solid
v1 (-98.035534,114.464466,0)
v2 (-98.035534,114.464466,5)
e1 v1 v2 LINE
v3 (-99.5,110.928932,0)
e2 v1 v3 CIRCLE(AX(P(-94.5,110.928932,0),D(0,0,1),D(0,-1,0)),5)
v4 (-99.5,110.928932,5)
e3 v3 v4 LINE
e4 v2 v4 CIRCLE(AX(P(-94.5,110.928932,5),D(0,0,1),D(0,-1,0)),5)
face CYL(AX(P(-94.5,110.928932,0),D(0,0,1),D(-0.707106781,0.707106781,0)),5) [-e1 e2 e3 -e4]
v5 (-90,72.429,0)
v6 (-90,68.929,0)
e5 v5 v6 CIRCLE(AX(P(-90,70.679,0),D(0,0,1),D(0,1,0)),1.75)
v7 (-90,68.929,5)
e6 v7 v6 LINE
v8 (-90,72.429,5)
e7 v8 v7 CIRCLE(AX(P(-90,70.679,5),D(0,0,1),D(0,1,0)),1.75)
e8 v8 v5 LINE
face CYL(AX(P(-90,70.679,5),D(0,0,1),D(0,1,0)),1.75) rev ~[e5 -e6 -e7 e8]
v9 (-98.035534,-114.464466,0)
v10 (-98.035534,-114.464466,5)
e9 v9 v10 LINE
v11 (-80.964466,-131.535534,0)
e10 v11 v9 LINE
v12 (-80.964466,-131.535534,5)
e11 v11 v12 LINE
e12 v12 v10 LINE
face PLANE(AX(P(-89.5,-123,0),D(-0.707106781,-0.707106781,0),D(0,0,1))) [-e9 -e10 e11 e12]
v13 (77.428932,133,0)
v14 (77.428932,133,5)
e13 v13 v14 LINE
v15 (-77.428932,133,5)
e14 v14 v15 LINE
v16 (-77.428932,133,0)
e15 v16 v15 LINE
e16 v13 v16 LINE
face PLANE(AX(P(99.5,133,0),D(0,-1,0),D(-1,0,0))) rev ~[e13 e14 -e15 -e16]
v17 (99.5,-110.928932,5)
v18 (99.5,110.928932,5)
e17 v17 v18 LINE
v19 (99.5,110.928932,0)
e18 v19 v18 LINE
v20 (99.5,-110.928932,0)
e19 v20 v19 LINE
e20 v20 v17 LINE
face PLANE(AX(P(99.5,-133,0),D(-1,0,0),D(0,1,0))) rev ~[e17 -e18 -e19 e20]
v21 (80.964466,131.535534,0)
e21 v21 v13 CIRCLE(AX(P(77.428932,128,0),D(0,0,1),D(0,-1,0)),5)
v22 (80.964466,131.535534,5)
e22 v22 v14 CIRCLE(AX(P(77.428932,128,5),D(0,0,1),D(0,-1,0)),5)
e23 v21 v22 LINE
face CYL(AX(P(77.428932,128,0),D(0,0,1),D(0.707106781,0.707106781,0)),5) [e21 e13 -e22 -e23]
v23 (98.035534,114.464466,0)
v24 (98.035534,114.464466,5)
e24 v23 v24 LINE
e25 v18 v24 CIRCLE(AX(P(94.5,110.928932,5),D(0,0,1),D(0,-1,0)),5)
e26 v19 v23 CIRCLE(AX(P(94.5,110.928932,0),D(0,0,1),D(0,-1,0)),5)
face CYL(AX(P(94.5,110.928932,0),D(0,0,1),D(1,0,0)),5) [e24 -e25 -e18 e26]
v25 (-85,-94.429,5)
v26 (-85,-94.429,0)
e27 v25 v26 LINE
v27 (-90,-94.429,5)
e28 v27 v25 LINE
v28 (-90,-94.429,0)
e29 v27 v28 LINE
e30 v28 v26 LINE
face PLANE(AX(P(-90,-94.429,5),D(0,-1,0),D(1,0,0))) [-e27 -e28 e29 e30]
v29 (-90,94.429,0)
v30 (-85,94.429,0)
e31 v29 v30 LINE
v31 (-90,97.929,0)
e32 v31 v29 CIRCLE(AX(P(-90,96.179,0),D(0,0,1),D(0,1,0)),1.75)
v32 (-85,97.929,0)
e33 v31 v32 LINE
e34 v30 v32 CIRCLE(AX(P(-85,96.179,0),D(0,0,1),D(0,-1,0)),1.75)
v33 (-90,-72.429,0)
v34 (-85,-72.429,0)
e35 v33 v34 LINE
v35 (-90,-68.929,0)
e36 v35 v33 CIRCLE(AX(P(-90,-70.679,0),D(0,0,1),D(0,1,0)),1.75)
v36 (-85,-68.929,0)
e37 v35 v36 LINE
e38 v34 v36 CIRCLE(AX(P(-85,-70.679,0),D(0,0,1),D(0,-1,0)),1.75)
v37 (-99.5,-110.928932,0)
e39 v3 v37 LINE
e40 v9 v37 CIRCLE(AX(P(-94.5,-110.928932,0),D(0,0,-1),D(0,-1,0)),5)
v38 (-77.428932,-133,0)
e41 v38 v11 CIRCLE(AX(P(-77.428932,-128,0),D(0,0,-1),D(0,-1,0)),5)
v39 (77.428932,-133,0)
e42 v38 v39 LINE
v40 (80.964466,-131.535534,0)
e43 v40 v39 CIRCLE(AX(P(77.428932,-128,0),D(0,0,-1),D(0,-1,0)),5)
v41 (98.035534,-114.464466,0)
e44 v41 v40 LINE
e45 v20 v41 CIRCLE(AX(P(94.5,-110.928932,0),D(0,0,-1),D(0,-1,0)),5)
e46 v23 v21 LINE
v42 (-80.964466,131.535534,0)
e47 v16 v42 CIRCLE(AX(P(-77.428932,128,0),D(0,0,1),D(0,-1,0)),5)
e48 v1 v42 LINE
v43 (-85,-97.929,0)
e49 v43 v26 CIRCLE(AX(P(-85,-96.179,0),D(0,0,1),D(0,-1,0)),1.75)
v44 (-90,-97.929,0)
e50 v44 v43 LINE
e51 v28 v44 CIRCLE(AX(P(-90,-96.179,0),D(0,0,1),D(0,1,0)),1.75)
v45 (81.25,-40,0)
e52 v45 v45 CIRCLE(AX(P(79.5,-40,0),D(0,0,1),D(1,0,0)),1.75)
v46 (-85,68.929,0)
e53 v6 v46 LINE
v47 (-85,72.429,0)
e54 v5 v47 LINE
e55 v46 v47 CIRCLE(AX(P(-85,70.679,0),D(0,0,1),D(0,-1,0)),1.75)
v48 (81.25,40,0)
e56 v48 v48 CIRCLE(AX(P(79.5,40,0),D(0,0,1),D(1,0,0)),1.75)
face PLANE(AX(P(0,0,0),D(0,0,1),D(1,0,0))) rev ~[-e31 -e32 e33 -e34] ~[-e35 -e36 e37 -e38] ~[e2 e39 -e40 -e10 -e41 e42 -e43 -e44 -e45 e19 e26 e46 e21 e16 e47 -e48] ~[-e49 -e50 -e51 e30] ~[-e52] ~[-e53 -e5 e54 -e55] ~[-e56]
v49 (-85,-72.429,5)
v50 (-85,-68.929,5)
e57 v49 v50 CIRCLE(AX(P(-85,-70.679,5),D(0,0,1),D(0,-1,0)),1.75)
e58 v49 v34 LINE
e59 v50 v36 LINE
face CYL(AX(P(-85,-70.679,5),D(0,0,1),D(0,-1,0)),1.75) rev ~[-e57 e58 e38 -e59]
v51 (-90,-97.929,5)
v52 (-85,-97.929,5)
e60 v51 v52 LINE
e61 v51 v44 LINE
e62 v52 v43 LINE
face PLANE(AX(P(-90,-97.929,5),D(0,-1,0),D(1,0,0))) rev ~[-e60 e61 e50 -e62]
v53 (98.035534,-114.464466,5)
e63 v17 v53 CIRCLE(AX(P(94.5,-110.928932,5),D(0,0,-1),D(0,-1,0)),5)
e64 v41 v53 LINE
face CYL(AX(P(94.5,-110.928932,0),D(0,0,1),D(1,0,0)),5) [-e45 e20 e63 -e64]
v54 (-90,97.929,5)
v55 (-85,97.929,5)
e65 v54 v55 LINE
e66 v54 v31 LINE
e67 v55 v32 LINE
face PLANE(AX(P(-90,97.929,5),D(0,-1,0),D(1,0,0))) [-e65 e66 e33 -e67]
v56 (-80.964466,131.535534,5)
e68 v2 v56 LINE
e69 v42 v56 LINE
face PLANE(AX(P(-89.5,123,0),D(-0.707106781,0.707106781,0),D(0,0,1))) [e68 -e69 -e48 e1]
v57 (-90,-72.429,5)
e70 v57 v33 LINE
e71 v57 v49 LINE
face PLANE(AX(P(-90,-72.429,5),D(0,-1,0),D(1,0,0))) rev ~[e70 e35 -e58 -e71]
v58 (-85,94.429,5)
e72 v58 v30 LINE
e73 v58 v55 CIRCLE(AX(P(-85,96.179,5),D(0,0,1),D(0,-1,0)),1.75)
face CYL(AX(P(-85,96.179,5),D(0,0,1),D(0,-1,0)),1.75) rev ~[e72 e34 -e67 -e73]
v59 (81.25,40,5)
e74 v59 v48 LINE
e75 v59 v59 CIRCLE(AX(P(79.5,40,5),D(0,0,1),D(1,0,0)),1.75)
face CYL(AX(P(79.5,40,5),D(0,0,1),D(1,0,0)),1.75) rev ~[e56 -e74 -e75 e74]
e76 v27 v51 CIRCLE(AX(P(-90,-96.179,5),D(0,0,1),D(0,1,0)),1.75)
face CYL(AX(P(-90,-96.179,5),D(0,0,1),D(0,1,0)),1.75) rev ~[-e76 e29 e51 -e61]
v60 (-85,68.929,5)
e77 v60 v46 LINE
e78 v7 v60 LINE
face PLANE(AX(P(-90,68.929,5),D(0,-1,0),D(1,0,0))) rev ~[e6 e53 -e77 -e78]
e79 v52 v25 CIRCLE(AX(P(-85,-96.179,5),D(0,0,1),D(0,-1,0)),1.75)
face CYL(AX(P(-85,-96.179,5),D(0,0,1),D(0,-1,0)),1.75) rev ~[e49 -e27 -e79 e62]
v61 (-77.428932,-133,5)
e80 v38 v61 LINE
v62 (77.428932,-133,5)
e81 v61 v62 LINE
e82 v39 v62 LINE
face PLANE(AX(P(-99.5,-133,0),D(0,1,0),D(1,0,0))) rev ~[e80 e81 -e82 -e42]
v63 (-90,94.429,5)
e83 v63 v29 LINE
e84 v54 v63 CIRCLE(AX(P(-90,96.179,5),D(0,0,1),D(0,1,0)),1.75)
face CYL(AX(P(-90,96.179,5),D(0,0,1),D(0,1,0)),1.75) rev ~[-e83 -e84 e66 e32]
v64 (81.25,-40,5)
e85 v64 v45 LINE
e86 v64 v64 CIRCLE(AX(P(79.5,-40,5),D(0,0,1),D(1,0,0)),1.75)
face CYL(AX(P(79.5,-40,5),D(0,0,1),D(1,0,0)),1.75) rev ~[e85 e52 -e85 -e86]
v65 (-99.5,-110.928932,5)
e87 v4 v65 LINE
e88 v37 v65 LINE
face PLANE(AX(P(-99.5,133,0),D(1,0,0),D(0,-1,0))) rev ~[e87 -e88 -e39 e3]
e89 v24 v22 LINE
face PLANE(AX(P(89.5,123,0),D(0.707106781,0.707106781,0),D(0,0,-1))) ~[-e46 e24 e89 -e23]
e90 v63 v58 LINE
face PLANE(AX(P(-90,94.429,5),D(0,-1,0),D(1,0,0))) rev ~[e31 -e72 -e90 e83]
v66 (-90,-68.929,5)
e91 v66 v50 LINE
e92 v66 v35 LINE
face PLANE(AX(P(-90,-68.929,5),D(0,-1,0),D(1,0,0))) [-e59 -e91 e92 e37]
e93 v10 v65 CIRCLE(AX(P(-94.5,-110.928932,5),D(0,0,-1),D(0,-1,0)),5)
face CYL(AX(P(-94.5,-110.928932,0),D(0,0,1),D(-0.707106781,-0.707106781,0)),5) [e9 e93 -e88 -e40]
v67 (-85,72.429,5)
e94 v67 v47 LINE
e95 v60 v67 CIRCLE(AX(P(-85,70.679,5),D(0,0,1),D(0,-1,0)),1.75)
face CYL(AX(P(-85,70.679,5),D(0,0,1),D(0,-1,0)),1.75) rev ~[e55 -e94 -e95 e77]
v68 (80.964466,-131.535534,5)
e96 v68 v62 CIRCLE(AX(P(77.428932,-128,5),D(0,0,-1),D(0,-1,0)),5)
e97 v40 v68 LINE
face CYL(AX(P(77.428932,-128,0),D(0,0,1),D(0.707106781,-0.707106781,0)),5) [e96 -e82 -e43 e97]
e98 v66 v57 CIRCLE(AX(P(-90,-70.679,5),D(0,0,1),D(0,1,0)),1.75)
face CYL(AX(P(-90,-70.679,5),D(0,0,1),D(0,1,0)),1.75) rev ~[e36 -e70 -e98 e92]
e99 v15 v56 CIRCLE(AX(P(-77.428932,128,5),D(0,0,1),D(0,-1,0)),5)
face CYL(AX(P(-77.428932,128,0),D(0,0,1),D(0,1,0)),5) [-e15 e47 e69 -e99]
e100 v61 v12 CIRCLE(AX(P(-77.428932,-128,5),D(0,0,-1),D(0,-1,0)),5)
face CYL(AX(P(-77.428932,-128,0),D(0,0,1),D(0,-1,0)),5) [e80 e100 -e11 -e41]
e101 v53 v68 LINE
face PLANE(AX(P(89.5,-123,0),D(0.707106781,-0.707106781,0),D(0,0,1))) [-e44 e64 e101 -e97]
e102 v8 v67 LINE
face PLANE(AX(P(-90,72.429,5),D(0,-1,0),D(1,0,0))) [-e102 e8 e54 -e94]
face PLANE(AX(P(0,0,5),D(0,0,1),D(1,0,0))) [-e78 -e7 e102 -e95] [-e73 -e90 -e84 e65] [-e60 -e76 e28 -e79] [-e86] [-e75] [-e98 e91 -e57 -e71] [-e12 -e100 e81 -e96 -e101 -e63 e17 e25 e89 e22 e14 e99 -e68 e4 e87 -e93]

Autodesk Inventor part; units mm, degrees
ref_plane "YZ Plane" through (0, 0, 0) normal (1, 0, 0) x (0, 1, 0)
ref_plane "XZ Plane" through (0, 0, 0) normal (0, 1, 0) x (-1, 0, 0)
ref_plane "XY Plane" through (0, 0, 0) normal (0, 0, 1) x (1, 0, 0)
sketch "Handle-Hole" plane through (0, 0, 0) normal (0, 0, 1) x (1, 0, 0)
  line L0 (-99.5, 50) -> (-69.5, 50)
  line L1 (-69.5, 50) -> (-69.5, -50)
  line L2 (-69.5, -50) -> (-99.5, -50)
  line L3 (-99.5, -50) -> (-99.5, 50)
  circle A0 centre (-87.5, 62) radius 1.75
  circle A1 centre (-57.5, 27.5) radius 1.75
  circle A2 centre (-57.5, -27.5) radius 1.75
  circle A3 centre (-87.5, -62) radius 1.75
  point P0 (-82.2826, 0)
  point P1 (-99.5, 0)
  point P2 (-99.5, 0)
  dimension "d9" = 30
  dimension "d10" = 100
  dimension "d11" = 3.5
  dimension "d12" = 3.5
  dimension "d13" = 3.5
  dimension "d14" = 3.5
  dimension "d15" = 55
  dimension "d16" = 12
  dimension "d17" = 12
  dimension "d18" = 12
sketch "Hinges Screw Holes" plane through (0, 0, 0) normal (0, 0, 1) x (1, 0, 0)
  arc A0 (172, -72.429) -> (172, -68.929) centre (172, -70.679) ccw
  arc A1 (172, -97.929) -> (172, -94.429) centre (172, -96.179) ccw
  arc A2 (167, 97.929) -> (167, 94.429) centre (167, 96.179) ccw
  arc A3 (167, 72.429) -> (167, 68.929) centre (167, 70.679) ccw
  arc A4 (167, -68.929) -> (167, -72.429) centre (167, -70.679) ccw
  arc A5 (167, -94.429) -> (167, -97.929) centre (167, -96.179) ccw
  line L0 (167, 97.929) -> (172, 97.929)
  line L1 (167, 94.429) -> (172, 94.429)
  line L2 (167, 72.429) -> (172, 72.429)
  line L3 (167, 68.929) -> (172, 68.929)
  line L4 (167, -68.929) -> (172, -68.929)
  line L5 (167, -72.429) -> (172, -72.429)
  line L6 (167, -94.429) -> (172, -94.429)
  line L7 (167, -97.929) -> (172, -97.929)
  arc A6 (172, 94.429) -> (172, 97.929) centre (172, 96.179) ccw
  arc A7 (172, 68.929) -> (172, 72.429) centre (172, 70.679) ccw
  point P0 (169.5, 0)
  dimension "d20" = 3.5
  dimension "d26" = 141.358
  dimension "d29" = 25.5
  dimension "d31" = 3.5
  dimension "d32" = 25.5
  dimension "d34" = 5
sketch "Sketch1" plane through (0, 0, 0) normal (0, 0, 1) x (1, 0, 0)
  line L0 (-100, 133.5) -> (100, 133.5)
  line L1 (100, 133.5) -> (100, -133.5)
  line L2 (100, -133.5) -> (-100, -133.5)
  line L3 (-100, -133.5) -> (-100, 133.5)
  line L4 (99.5, 133) -> (-99.5, 133)
  line L5 (-99.5, 133) -> (-99.5, -133)
  line L6 (-99.5, -133) -> (99.5, -133)
  line L7 (99.5, -133) -> (99.5, 133)
  point P0 (0, 0)
  point P1 (0, 133.5)
  point P2 (-99.5, 0)
  dimension "d0" = 200
  dimension "d1" = 267
  dimension "d4" = 0.5
extrude "Extrusion1" add sketch "Sketch1" along normal blind 5 contours L7 L6 L5 L4
chamfer "Chamfer1" distance 20 angle 45 4 edges at (-99.5, -133, 2.5) (-99.5, 133, 2.5) (99.5, -133, 2.5) (99.5, 133, 2.5)
fillet "Fillet1" radius 5 8 edges at (-79.5, -133, 2.5) (79.5, -133, 2.5) (99.5, -113, 2.5) (99.5, 113, 2.5) (79.5, 133, 2.5) (-79.5, 133, 2.5) (-99.5, 113, 2.5) (-99.5, -113, 2.5)
sketch "Sketch2" plane through (0, 0, 5) normal (0, 0, 1) x (1, 0, 0)
  line L0 (99.5, -110.9289) -> (99.5, 110.9289) projected
  line L1 (-99.5, 110.9289) -> (-99.5, -110.9289) projected
  circle A0 centre (79.5, 40) radius 1.75
  circle A1 centre (79.5, -40) radius 1.75
  arc A2 (-85, -72.429) -> (-85, -68.929) centre (-85, -70.679) ccw
  arc A3 (-85, -97.929) -> (-85, -94.429) centre (-85, -96.179) ccw
  arc A4 (-90, 97.929) -> (-90, 94.429) centre (-90, 96.179) ccw
  arc A5 (-90, 72.429) -> (-90, 68.929) centre (-90, 70.679) ccw
  arc A6 (-90, -68.929) -> (-90, -72.429) centre (-90, -70.679) ccw
  arc A7 (-90, -94.429) -> (-90, -97.929) centre (-90, -96.179) ccw
  line L2 (-90, 97.929) -> (-85, 97.929)
  line L3 (-90, 94.429) -> (-85, 94.429)
  line L4 (-90, 72.429) -> (-85, 72.429)
  line L5 (-90, 68.929) -> (-85, 68.929)
  line L6 (-90, -68.929) -> (-85, -68.929)
  line L7 (-90, -72.429) -> (-85, -72.429)
  line L8 (-90, -94.429) -> (-85, -94.429)
  line L9 (-90, -97.929) -> (-85, -97.929)
  arc A8 (-85, 94.429) -> (-85, 97.929) centre (-85, 96.179) ccw
  arc A9 (-85, 68.929) -> (-85, 72.429) centre (-85, 70.679) ccw
  point P0 (0, 0)
  dimension "d36" = 141.358
  dimension "d35" = 70.679
  dimension "d37" = 9.5
  dimension "d38" = 9.5
  dimension "d44" = 3.5
  dimension "d45" = 3.5
  dimension "d46" = 80
  dimension "d47" = 40
  dimension "d48" = 20
extrude "Extrusion2" cut sketch "Sketch2" against normal blind 10
equation "\"d35\" = 0.5 * d36"
equation "\"d47\" = 0.5 * d46"
equation "\"d16\" = d17"
equation "\"d17\" = d19"
equation "\"d18\" = d19"
equation "\"d32\" = d29"
equation "\"d19\" = 12"
properties part number "Clear Left Side Door" material "Glass"
